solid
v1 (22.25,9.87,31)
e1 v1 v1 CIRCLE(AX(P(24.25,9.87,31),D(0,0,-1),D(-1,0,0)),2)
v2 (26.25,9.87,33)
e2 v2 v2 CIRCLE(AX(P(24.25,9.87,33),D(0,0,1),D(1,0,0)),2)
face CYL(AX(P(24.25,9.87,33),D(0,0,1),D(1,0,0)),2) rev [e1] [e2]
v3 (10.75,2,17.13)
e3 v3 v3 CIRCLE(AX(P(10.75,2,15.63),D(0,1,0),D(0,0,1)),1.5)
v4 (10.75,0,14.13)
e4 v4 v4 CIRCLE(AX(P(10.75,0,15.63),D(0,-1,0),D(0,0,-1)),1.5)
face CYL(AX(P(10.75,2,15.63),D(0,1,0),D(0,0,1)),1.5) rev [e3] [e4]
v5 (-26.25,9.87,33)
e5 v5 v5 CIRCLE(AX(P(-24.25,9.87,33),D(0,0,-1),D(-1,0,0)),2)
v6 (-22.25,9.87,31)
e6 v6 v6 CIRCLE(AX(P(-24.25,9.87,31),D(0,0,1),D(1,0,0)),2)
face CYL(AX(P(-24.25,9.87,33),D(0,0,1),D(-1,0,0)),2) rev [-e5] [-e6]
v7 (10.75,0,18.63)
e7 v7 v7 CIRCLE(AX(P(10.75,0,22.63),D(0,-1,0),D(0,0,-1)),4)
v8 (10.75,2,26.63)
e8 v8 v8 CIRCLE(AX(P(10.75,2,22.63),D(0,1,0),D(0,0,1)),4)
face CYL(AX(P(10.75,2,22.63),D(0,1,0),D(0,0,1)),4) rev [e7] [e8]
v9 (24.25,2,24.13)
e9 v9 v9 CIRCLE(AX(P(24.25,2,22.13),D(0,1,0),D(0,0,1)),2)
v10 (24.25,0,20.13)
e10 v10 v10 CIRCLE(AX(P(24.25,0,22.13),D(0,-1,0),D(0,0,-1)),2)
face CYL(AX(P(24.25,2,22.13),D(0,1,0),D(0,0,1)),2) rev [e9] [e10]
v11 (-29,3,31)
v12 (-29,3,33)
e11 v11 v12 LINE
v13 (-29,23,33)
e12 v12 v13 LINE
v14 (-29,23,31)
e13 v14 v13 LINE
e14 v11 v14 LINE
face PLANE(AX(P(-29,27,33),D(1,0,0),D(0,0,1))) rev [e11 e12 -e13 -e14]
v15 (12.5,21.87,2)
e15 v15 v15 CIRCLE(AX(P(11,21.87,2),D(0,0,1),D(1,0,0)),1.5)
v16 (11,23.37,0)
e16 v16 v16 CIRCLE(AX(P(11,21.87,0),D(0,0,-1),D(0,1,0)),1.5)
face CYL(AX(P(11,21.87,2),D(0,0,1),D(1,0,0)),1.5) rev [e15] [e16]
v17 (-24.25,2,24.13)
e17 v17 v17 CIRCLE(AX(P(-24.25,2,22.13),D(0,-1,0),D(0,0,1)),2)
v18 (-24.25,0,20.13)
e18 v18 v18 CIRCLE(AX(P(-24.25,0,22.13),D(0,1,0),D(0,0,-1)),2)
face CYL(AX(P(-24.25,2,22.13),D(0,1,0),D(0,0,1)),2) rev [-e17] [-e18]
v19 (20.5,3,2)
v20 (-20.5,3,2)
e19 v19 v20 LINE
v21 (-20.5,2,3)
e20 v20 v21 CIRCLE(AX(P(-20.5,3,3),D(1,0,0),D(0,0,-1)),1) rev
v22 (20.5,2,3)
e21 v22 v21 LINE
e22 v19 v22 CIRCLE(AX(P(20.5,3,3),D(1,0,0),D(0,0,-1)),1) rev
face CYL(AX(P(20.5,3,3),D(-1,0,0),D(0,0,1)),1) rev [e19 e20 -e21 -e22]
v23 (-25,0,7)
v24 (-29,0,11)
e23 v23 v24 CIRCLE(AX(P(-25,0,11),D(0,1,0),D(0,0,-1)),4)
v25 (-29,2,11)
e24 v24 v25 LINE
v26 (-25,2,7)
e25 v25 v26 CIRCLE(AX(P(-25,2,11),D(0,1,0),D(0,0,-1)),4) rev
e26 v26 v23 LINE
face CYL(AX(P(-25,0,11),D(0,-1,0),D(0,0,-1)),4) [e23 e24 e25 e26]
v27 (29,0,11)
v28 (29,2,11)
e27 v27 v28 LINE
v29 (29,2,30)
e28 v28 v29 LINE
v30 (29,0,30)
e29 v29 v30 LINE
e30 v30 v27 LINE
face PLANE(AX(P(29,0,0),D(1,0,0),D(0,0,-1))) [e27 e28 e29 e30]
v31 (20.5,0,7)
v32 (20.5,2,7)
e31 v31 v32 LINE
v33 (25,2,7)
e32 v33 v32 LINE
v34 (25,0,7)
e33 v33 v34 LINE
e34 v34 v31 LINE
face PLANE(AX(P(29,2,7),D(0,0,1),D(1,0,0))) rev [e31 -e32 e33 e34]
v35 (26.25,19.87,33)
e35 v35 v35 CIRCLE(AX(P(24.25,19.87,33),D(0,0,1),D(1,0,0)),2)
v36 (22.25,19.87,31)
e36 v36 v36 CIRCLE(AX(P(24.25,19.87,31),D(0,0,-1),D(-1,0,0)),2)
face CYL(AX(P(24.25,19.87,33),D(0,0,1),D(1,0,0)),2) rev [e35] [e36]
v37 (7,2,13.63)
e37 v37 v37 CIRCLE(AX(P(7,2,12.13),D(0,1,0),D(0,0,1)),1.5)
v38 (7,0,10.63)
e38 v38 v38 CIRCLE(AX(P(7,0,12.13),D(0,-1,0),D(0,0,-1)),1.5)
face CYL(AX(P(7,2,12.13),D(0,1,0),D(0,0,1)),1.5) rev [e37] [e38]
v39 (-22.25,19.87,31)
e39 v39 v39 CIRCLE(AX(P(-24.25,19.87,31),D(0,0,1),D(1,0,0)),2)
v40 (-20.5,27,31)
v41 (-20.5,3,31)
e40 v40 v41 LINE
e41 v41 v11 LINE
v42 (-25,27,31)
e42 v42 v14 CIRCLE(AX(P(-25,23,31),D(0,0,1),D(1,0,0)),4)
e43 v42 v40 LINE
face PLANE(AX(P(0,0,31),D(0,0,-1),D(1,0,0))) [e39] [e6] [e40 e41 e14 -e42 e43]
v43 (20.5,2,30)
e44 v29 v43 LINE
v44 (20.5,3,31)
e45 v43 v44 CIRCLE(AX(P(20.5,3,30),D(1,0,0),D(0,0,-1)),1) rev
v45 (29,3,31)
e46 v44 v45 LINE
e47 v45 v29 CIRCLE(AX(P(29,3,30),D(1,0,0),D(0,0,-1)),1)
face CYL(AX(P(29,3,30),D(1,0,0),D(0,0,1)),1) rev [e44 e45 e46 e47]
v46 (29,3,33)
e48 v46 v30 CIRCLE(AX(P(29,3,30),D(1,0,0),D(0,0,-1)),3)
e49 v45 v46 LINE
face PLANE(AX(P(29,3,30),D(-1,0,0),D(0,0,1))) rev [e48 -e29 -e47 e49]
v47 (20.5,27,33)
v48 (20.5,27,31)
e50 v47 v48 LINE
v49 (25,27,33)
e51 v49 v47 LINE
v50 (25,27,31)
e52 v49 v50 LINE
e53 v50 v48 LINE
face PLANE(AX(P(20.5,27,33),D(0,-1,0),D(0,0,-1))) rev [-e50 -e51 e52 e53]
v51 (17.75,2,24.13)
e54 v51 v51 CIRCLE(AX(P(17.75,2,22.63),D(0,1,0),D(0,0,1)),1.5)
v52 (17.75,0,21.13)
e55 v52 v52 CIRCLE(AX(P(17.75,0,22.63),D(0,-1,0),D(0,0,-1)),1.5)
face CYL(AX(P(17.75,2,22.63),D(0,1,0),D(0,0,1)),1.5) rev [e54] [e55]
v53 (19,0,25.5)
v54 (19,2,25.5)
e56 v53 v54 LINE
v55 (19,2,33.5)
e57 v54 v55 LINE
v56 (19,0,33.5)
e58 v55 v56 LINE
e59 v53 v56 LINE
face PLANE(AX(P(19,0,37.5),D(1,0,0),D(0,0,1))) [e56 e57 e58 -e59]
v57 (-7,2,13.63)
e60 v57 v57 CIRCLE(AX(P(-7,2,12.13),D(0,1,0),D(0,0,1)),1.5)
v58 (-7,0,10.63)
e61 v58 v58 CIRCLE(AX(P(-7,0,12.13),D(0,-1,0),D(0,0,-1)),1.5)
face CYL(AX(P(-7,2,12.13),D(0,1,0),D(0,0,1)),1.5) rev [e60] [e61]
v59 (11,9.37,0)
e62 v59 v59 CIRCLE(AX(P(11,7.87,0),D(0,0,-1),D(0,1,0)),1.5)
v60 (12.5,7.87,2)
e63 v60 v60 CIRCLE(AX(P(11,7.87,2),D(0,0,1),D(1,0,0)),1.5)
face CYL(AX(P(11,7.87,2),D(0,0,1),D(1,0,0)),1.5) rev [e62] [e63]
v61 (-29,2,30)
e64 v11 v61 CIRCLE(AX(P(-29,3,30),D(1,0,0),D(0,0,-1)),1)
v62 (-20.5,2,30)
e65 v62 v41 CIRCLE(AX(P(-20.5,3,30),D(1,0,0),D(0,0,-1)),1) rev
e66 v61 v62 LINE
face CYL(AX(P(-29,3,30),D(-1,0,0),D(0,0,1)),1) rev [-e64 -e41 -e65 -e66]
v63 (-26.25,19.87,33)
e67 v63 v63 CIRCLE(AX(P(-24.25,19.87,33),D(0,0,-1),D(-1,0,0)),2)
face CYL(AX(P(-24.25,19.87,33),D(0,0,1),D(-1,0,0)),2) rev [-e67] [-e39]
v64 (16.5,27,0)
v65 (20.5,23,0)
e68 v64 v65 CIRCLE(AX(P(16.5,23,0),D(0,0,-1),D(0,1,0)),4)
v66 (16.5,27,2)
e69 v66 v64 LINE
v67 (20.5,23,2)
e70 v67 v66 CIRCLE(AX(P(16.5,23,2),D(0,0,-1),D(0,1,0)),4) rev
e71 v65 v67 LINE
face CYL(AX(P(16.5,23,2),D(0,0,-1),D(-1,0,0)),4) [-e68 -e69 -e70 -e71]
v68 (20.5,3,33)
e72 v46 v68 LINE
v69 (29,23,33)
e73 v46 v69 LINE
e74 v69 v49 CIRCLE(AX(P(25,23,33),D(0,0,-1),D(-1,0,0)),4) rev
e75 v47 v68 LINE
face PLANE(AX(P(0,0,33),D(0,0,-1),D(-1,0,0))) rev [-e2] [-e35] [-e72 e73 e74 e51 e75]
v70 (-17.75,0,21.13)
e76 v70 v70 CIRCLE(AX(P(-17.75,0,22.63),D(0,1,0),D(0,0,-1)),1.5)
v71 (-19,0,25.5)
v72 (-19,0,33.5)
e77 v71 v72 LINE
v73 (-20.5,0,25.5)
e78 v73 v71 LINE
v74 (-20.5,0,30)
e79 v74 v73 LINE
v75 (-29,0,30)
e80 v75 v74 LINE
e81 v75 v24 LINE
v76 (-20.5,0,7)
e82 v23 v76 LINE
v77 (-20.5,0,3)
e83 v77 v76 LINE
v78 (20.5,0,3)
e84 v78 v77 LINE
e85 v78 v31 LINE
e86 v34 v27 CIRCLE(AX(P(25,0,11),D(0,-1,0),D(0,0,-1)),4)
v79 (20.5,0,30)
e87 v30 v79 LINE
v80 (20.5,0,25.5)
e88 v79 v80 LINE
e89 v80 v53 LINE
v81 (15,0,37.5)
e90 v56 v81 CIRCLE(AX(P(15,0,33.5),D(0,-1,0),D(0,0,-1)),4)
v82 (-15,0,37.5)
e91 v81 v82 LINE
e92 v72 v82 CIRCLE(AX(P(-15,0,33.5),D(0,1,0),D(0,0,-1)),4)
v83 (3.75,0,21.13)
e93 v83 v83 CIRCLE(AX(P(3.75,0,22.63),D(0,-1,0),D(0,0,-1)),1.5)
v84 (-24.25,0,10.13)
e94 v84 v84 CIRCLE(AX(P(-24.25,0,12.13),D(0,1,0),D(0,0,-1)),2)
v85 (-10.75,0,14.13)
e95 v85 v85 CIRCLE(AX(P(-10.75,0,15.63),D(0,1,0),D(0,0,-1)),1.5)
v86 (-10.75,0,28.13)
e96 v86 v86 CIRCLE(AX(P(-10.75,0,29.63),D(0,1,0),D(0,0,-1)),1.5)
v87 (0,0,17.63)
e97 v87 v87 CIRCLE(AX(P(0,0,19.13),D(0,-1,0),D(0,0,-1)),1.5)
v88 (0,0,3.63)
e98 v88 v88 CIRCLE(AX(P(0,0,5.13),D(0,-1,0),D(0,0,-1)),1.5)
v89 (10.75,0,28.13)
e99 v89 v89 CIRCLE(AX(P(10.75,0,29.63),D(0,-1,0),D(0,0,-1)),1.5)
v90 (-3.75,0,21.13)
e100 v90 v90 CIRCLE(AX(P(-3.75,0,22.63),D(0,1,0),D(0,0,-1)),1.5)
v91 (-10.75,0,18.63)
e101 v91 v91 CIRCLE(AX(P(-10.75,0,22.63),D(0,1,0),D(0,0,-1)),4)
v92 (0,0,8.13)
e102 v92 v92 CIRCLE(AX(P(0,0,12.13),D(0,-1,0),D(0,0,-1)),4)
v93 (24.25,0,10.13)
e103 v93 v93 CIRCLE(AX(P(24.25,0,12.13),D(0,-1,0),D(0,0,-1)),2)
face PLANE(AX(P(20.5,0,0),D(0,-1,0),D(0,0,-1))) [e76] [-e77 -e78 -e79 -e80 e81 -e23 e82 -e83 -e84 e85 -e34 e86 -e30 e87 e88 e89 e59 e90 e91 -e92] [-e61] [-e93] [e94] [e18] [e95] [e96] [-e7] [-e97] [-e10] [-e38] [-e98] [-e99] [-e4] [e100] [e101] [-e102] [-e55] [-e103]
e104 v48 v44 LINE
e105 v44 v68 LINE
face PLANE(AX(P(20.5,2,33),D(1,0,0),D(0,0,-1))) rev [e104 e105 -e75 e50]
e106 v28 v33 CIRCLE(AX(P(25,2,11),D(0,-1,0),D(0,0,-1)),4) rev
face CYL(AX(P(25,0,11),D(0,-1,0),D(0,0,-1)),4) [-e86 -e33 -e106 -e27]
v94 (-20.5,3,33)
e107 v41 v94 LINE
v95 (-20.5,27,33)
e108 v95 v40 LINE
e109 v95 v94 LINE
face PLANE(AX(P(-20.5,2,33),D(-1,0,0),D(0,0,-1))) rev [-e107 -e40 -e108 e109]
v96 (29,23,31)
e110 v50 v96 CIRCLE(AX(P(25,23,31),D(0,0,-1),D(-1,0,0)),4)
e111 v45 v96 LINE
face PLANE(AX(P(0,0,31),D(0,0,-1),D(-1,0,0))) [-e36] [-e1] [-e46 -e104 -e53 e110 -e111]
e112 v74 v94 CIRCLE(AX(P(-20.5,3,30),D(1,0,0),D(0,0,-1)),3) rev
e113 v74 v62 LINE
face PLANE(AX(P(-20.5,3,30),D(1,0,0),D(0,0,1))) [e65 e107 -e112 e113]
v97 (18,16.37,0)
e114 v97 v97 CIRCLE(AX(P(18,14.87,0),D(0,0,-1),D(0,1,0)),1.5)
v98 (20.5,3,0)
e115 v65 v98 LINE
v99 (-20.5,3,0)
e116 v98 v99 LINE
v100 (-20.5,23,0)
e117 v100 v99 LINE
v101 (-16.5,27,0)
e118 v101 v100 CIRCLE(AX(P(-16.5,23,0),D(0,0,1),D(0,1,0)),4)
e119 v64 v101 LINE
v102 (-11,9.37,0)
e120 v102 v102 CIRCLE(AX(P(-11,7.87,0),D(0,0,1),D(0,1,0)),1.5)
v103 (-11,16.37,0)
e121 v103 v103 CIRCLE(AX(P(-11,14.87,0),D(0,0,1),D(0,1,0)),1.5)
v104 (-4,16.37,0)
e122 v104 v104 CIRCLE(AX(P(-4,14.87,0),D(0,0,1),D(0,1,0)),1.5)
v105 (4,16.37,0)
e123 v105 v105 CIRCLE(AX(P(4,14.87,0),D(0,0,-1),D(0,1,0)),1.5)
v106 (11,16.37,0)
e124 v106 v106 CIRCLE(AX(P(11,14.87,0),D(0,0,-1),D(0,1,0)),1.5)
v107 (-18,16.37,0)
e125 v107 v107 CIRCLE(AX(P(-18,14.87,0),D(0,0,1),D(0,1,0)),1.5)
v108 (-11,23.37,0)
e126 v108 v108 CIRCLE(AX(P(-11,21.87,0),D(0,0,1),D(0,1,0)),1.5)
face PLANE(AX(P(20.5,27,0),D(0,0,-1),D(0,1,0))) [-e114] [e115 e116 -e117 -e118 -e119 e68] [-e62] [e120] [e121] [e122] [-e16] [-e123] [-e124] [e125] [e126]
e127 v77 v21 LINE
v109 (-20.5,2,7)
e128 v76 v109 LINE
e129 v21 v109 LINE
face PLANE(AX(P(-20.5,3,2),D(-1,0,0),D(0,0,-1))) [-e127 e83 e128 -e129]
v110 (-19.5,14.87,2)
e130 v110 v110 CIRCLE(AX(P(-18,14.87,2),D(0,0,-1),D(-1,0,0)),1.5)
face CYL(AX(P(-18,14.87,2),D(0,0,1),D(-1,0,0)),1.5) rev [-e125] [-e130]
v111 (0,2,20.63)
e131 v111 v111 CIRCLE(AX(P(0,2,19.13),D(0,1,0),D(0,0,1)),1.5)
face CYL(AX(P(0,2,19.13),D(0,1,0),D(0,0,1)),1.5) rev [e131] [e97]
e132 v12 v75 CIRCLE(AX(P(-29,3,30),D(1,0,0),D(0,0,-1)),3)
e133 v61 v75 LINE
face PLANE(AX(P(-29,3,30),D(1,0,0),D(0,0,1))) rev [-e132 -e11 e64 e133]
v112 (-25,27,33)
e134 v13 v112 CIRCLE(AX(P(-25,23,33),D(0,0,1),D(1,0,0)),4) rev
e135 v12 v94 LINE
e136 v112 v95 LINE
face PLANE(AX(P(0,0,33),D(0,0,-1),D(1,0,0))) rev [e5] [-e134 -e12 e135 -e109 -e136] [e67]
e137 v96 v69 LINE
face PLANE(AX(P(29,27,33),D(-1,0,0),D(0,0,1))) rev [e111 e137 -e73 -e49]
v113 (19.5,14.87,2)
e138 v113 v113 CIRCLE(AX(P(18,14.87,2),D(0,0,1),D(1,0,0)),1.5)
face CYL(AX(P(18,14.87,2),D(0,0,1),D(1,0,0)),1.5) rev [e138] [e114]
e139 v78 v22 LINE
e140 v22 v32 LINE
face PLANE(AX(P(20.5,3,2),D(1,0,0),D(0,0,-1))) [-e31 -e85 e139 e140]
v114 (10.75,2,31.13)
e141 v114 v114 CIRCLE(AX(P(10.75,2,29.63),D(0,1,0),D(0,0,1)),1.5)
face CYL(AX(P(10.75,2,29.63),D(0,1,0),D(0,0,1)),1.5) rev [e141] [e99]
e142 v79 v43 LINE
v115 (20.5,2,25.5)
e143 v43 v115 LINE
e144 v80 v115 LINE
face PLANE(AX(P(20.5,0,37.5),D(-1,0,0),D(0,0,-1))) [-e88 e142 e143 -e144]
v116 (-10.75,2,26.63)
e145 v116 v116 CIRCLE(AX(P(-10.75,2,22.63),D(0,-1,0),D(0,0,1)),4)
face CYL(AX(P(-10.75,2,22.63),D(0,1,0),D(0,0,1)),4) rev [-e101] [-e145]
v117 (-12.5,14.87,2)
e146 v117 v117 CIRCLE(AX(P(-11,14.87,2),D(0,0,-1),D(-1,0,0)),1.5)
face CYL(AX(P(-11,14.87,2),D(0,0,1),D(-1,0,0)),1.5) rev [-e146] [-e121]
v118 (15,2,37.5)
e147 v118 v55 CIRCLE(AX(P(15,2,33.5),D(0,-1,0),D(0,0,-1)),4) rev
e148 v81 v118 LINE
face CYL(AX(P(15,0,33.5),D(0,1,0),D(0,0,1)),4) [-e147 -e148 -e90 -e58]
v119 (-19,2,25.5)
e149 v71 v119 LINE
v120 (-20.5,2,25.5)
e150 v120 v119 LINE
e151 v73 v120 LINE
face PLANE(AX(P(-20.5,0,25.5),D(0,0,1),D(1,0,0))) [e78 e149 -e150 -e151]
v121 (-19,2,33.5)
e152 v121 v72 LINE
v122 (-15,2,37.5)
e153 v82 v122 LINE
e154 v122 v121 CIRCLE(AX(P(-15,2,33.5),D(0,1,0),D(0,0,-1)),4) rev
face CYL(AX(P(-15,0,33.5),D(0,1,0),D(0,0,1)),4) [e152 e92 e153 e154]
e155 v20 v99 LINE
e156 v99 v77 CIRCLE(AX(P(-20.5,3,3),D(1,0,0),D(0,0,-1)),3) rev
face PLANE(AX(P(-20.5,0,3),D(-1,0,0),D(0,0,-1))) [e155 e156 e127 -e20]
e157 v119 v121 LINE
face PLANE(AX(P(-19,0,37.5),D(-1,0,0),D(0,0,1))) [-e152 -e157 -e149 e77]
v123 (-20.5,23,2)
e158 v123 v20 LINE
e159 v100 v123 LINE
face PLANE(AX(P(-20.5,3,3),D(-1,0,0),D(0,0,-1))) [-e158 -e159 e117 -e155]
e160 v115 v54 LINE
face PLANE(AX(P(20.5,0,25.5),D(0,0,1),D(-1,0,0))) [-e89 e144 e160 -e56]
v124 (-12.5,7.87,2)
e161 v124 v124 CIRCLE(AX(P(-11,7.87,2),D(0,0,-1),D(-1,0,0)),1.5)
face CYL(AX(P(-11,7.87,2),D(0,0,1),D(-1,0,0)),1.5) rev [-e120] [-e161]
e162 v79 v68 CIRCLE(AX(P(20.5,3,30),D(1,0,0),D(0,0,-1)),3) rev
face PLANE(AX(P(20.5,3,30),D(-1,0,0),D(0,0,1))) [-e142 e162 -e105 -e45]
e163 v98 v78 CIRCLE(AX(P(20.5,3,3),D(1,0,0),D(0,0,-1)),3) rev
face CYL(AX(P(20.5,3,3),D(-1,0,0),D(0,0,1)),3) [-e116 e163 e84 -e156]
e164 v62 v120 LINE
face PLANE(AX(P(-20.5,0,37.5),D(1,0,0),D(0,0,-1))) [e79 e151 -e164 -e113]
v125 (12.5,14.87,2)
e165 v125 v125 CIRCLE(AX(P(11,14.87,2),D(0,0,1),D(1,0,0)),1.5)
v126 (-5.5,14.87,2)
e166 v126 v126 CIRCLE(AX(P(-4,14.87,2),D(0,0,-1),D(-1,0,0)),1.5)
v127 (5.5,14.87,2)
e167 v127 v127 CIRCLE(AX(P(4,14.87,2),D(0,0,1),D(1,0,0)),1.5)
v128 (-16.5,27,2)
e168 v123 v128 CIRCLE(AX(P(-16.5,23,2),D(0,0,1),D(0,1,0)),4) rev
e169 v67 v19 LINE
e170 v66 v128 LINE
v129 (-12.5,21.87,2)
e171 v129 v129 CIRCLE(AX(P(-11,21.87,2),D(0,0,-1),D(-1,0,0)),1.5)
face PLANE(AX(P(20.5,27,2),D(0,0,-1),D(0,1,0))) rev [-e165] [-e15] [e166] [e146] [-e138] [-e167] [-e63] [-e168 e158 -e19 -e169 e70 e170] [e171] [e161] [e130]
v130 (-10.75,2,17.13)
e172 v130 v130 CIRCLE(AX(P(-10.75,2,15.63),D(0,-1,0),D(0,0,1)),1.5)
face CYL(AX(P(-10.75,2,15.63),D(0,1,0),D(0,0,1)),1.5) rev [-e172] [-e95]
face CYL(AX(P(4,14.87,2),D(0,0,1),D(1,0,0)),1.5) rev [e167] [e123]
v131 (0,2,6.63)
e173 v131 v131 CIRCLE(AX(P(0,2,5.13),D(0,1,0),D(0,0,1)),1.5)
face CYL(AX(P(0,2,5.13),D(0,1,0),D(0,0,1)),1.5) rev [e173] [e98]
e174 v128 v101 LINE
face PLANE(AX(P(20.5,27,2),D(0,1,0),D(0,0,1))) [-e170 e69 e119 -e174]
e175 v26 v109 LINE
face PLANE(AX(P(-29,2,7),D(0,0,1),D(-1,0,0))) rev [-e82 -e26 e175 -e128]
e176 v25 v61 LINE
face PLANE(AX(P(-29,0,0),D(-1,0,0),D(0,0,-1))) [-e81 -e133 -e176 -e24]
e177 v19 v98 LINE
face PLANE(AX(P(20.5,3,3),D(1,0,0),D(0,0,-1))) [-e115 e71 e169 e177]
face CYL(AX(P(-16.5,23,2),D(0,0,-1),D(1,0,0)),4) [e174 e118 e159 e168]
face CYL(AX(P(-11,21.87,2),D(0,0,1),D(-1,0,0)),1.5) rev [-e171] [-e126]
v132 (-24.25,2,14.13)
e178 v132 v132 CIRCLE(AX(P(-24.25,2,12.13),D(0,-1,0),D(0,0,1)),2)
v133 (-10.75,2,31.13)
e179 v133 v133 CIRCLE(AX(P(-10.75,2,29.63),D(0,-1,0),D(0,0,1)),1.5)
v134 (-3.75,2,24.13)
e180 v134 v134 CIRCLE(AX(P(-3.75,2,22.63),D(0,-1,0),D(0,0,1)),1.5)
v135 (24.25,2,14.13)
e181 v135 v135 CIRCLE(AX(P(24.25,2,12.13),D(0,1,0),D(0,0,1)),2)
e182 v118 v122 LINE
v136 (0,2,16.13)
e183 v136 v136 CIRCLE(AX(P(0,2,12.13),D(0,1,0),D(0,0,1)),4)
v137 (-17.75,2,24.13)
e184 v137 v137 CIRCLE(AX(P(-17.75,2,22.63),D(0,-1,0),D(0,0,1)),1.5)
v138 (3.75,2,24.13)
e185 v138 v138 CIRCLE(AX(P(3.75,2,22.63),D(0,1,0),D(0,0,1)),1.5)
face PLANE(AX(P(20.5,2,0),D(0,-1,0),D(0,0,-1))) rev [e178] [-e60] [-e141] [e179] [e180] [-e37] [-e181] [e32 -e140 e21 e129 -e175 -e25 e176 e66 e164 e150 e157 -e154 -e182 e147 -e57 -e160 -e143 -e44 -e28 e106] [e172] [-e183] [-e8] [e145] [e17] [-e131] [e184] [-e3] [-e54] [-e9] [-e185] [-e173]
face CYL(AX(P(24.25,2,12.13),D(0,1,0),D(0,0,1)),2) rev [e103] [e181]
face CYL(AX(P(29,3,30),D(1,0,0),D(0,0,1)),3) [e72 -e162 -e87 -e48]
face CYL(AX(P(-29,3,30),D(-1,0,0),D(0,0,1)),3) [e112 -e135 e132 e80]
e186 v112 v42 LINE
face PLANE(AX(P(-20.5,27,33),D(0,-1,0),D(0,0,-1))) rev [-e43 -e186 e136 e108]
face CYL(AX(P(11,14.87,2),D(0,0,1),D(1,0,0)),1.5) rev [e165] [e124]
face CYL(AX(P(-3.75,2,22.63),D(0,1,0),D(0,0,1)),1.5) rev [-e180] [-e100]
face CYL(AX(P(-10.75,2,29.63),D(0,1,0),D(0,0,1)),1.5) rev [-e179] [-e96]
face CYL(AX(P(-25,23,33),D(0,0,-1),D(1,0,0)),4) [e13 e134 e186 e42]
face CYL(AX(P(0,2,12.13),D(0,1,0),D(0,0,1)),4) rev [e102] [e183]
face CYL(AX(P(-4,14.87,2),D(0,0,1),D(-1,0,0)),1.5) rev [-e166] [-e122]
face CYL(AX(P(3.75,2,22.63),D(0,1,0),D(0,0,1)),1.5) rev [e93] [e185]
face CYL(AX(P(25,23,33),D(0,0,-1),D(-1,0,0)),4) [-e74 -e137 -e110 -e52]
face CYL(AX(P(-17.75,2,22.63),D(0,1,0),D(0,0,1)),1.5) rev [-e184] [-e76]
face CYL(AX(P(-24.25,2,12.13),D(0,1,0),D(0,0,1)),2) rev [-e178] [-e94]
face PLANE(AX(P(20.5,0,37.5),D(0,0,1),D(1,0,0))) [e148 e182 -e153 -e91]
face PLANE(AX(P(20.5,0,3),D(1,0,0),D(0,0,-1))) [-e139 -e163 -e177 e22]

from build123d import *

# Parameters (mm, degrees)
T_LE_DE_BASE_PLI_E1_DEPTH             = 20.5
ESQUISSE8_W                           = 24
ESQUISSE8_H                           = 2
BOSS_EXTRU_1_DEPTH                    = 8.5
T_LE_PLI_E_SUR_AR_TE1_STRIP_W         = 10
T_LE_PLI_E_SUR_AR_TE1_STRIP_H         = 2
T_LE_PLI_E_SUR_AR_TE1_STRIP_CUT_DEPTH = 8.5
T_LE_PLI_E_SUR_AR_TE1_DEPTH           = 8.5
ESQUISSE12_W                          = 1.5
ESQUISSE12_H                          = 12
ENL_V_MAT_EXTRU_1_DEPTH               = 8.5
DIAM_TRE_DU_PER_AGE_4_0_4_1_D         = 4
DIAM_TRE_DU_PER_AGE_8_0_8_1_D         = 8
F_3_0_3_DIAMETER_HOLE3_D              = 3
R_P_TITION_CIRCULAIRE1_COUNT          = 4
DIAM_TRE_DU_PER_AGE_4_0_4_2_D         = 4
F_3_0_3_DIAMETER_HOLE1_D              = 3
CIRPATTERN1_COUNT                     = 4
CONG_1_R                              = 4
DIAM_TRE_DU_PER_AGE_8_0_8_2_D         = 8
F_3_0_3_DIAMETER_HOLE2_D              = 3
R_P_TITION_CIRCULAIRE2_COUNT          = 4


# Sheet-metal steps are written as plain solids
with BuildPart() as part:
    # Esquisse1 → Tôle de base pliée1 (new body)
    with BuildSketch(Plane(origin=(0, 0, 0), x_dir=(0, 0, -1), z_dir=(1, 0, 0))):
        with BuildLine():
            Line((0, 27), (0, 3))
            ThreePointArc((0, 3), (-0.878679656, 0.878679656), (-3, 0))
            Line((-3, 0), (-37.5, 0))
            Line((-37.5, 0), (-37.5, 2))
            Line((-37.5, 2), (-3, 2))
            ThreePointArc((-3, 2), (-2.292893219, 2.292893219), (-2, 3))
            Line((-2, 3), (-2, 27))
            Line((-2, 27), (0, 27))
        make_face()
    extrude(amount=T_LE_DE_BASE_PLI_E1_DEPTH)

    # Esquisse8 → Boss.-Extru.1 (add)
    with BuildSketch(Plane(origin=(20.5, 0, 0), x_dir=(0, 0, -1), z_dir=(1, 0, 0))):
        with Locations((-19, 1)):
            Rectangle(ESQUISSE8_W, ESQUISSE8_H)
    extrude(amount=BOSS_EXTRU_1_DEPTH)

    # Tôle pliée sur arête1 strip (across the edge) → Tôle pliée sur arête1 strip cut (cut)
    with BuildSketch(Plane(origin=(20.5, 2, 31), x_dir=(0, 0, -1), z_dir=(1, 0, 0))):
        with Locations((-4, -1)):
            Rectangle(T_LE_PLI_E_SUR_AR_TE1_STRIP_W, T_LE_PLI_E_SUR_AR_TE1_STRIP_H)
    extrude(amount=T_LE_PLI_E_SUR_AR_TE1_STRIP_CUT_DEPTH, mode=Mode.SUBTRACT)

    # Tôle pliée sur arête1 section (across the edge) → Tôle pliée sur arête1 (add)
    with BuildSketch(Plane(origin=(20.5, 2, 31), x_dir=(0, 0, -1), z_dir=(1, 0, 0))):
        with BuildLine():
            Line((-2, 1), (-2, 25))
            Line((-2, 25), (0, 25))
            Line((0, 25), (0, 1))
            ThreePointArc((0, 1), (0.292893219, 0.292893219), (1, 0))
            Line((1, 0), (1, -2))
            ThreePointArc((1, -2), (-1.121320344, -1.121320344), (-2, 1))
        make_face()
    extrude(amount=T_LE_PLI_E_SUR_AR_TE1_DEPTH)

    # Esquisse12 → Enlèv. mat.-Extru.1 (cut)
    with BuildSketch(Plane(origin=(0, 2, 0), x_dir=(1, 0, 0), z_dir=(0, 1, 0))):
        with Locations((19.75, -31.5)):
            Rectangle(ESQUISSE12_W, ESQUISSE12_H)
    extrude(amount=-ENL_V_MAT_EXTRU_1_DEPTH, mode=Mode.SUBTRACT)

    # Diamètre du perçage Ø4.0 (4)1 (through all)
    with Locations(Plane(origin=(0, 2, 0), x_dir=(1, 0, 0), z_dir=(0, 1, 0))):
        with Locations((24.25, -12.13), (24.25, -22.13)):
            Hole(DIAM_TRE_DU_PER_AGE_4_0_4_1_D / 2)

    # Diamètre du perçage Ø8.0 (8)1 (through all)
    with Locations(Plane(origin=(0, 2, 0), x_dir=(1, 0, 0), z_dir=(0, 1, 0))):
        with Locations((10.75, -22.63)):
            Hole(DIAM_TRE_DU_PER_AGE_8_0_8_1_D / 2)

    # Ø3.0 (3) Diameter Hole3 (through all)
    with Locations(Plane(origin=(0, 2, 0), x_dir=(1, 0, 0), z_dir=(0, 1, 0))):
        with Locations((10.75, -15.63)):
            f_3_0_3_diameter_hole3 = Hole(F_3_0_3_DIAMETER_HOLE3_D / 2)

    # Répétition circulaire1: Ø3.0 (3) Diameter Hole3 ×4 about axis
    r_p_tition_circulaire1_axis = Axis((10.75, 0, 22.63), (0, 1, 0))
    for i in range(1, R_P_TITION_CIRCULAIRE1_COUNT):
        add(f_3_0_3_diameter_hole3.rotate(r_p_tition_circulaire1_axis, i * 360 / R_P_TITION_CIRCULAIRE1_COUNT), mode=Mode.SUBTRACT)

    # Diamètre du perçage Ø4.0 (4)2 (through all)
    with Locations(Plane.XY.offset(33)):
        with Locations((24.25, 19.87), (24.25, 9.87)):
            Hole(DIAM_TRE_DU_PER_AGE_4_0_4_2_D / 2)

    # Ø3.0 (3) Diameter Hole1 (through all)
    with Locations(Plane.XY.offset(2)):
        with Locations((11, 14.87), (11, 21.87)):
            f_3_0_3_diameter_hole1 = Hole(F_3_0_3_DIAMETER_HOLE1_D / 2)

    # CirPattern1: Ø3.0 (3) Diameter Hole1 ×4 about axis
    cirpattern1_axis = Axis((11, 14.87, 0), (0, 0, 1))
    for i in range(1, CIRPATTERN1_COUNT):
        add(f_3_0_3_diameter_hole1.rotate(cirpattern1_axis, i * 360 / CIRPATTERN1_COUNT), mode=Mode.SUBTRACT)

    # Congé1
    cong_1_edges = [part.edges().sort_by_distance(p)[0] for p in [
        (20.5, 27, 1),
        (29, 1, 7),
        (29, 27, 32),
        (19, 1, 37.5),
    ]]
    fillet(cong_1_edges, radius=CONG_1_R)

    # Symétrie1: part across plane


with BuildPart() as part_1:
    add(part.part)
    add(part.part.mirror(Plane(origin=(0, 3, 3), x_dir=(0, 0, 1), z_dir=(1, 0, 0))))

    # Diamètre du perçage Ø8.0 (8)2 (through all)
    with Locations(Plane(origin=(0, 2, 0), x_dir=(1, 0, 0), z_dir=(0, 1, 0))):
        with Locations((0, -12.13)):
            Hole(DIAM_TRE_DU_PER_AGE_8_0_8_2_D / 2)

    # Ø3.0 (3) Diameter Hole2 (through all)
    with Locations(Plane(origin=(0, 2, 0), x_dir=(1, 0, 0), z_dir=(0, 1, 0))):
        with Locations((0, -5.13)):
            f_3_0_3_diameter_hole2 = Hole(F_3_0_3_DIAMETER_HOLE2_D / 2)

    # Répétition circulaire2: Ø3.0 (3) Diameter Hole2 ×4 about axis
    r_p_tition_circulaire2_axis = Axis((0, 0, 12.13), (0, 1, 0))
    for i in range(1, R_P_TITION_CIRCULAIRE2_COUNT):
        add(f_3_0_3_diameter_hole2.rotate(r_p_tition_circulaire2_axis, i * 360 / R_P_TITION_CIRCULAIRE2_COUNT), mode=Mode.SUBTRACT)


solid = part_1.part
